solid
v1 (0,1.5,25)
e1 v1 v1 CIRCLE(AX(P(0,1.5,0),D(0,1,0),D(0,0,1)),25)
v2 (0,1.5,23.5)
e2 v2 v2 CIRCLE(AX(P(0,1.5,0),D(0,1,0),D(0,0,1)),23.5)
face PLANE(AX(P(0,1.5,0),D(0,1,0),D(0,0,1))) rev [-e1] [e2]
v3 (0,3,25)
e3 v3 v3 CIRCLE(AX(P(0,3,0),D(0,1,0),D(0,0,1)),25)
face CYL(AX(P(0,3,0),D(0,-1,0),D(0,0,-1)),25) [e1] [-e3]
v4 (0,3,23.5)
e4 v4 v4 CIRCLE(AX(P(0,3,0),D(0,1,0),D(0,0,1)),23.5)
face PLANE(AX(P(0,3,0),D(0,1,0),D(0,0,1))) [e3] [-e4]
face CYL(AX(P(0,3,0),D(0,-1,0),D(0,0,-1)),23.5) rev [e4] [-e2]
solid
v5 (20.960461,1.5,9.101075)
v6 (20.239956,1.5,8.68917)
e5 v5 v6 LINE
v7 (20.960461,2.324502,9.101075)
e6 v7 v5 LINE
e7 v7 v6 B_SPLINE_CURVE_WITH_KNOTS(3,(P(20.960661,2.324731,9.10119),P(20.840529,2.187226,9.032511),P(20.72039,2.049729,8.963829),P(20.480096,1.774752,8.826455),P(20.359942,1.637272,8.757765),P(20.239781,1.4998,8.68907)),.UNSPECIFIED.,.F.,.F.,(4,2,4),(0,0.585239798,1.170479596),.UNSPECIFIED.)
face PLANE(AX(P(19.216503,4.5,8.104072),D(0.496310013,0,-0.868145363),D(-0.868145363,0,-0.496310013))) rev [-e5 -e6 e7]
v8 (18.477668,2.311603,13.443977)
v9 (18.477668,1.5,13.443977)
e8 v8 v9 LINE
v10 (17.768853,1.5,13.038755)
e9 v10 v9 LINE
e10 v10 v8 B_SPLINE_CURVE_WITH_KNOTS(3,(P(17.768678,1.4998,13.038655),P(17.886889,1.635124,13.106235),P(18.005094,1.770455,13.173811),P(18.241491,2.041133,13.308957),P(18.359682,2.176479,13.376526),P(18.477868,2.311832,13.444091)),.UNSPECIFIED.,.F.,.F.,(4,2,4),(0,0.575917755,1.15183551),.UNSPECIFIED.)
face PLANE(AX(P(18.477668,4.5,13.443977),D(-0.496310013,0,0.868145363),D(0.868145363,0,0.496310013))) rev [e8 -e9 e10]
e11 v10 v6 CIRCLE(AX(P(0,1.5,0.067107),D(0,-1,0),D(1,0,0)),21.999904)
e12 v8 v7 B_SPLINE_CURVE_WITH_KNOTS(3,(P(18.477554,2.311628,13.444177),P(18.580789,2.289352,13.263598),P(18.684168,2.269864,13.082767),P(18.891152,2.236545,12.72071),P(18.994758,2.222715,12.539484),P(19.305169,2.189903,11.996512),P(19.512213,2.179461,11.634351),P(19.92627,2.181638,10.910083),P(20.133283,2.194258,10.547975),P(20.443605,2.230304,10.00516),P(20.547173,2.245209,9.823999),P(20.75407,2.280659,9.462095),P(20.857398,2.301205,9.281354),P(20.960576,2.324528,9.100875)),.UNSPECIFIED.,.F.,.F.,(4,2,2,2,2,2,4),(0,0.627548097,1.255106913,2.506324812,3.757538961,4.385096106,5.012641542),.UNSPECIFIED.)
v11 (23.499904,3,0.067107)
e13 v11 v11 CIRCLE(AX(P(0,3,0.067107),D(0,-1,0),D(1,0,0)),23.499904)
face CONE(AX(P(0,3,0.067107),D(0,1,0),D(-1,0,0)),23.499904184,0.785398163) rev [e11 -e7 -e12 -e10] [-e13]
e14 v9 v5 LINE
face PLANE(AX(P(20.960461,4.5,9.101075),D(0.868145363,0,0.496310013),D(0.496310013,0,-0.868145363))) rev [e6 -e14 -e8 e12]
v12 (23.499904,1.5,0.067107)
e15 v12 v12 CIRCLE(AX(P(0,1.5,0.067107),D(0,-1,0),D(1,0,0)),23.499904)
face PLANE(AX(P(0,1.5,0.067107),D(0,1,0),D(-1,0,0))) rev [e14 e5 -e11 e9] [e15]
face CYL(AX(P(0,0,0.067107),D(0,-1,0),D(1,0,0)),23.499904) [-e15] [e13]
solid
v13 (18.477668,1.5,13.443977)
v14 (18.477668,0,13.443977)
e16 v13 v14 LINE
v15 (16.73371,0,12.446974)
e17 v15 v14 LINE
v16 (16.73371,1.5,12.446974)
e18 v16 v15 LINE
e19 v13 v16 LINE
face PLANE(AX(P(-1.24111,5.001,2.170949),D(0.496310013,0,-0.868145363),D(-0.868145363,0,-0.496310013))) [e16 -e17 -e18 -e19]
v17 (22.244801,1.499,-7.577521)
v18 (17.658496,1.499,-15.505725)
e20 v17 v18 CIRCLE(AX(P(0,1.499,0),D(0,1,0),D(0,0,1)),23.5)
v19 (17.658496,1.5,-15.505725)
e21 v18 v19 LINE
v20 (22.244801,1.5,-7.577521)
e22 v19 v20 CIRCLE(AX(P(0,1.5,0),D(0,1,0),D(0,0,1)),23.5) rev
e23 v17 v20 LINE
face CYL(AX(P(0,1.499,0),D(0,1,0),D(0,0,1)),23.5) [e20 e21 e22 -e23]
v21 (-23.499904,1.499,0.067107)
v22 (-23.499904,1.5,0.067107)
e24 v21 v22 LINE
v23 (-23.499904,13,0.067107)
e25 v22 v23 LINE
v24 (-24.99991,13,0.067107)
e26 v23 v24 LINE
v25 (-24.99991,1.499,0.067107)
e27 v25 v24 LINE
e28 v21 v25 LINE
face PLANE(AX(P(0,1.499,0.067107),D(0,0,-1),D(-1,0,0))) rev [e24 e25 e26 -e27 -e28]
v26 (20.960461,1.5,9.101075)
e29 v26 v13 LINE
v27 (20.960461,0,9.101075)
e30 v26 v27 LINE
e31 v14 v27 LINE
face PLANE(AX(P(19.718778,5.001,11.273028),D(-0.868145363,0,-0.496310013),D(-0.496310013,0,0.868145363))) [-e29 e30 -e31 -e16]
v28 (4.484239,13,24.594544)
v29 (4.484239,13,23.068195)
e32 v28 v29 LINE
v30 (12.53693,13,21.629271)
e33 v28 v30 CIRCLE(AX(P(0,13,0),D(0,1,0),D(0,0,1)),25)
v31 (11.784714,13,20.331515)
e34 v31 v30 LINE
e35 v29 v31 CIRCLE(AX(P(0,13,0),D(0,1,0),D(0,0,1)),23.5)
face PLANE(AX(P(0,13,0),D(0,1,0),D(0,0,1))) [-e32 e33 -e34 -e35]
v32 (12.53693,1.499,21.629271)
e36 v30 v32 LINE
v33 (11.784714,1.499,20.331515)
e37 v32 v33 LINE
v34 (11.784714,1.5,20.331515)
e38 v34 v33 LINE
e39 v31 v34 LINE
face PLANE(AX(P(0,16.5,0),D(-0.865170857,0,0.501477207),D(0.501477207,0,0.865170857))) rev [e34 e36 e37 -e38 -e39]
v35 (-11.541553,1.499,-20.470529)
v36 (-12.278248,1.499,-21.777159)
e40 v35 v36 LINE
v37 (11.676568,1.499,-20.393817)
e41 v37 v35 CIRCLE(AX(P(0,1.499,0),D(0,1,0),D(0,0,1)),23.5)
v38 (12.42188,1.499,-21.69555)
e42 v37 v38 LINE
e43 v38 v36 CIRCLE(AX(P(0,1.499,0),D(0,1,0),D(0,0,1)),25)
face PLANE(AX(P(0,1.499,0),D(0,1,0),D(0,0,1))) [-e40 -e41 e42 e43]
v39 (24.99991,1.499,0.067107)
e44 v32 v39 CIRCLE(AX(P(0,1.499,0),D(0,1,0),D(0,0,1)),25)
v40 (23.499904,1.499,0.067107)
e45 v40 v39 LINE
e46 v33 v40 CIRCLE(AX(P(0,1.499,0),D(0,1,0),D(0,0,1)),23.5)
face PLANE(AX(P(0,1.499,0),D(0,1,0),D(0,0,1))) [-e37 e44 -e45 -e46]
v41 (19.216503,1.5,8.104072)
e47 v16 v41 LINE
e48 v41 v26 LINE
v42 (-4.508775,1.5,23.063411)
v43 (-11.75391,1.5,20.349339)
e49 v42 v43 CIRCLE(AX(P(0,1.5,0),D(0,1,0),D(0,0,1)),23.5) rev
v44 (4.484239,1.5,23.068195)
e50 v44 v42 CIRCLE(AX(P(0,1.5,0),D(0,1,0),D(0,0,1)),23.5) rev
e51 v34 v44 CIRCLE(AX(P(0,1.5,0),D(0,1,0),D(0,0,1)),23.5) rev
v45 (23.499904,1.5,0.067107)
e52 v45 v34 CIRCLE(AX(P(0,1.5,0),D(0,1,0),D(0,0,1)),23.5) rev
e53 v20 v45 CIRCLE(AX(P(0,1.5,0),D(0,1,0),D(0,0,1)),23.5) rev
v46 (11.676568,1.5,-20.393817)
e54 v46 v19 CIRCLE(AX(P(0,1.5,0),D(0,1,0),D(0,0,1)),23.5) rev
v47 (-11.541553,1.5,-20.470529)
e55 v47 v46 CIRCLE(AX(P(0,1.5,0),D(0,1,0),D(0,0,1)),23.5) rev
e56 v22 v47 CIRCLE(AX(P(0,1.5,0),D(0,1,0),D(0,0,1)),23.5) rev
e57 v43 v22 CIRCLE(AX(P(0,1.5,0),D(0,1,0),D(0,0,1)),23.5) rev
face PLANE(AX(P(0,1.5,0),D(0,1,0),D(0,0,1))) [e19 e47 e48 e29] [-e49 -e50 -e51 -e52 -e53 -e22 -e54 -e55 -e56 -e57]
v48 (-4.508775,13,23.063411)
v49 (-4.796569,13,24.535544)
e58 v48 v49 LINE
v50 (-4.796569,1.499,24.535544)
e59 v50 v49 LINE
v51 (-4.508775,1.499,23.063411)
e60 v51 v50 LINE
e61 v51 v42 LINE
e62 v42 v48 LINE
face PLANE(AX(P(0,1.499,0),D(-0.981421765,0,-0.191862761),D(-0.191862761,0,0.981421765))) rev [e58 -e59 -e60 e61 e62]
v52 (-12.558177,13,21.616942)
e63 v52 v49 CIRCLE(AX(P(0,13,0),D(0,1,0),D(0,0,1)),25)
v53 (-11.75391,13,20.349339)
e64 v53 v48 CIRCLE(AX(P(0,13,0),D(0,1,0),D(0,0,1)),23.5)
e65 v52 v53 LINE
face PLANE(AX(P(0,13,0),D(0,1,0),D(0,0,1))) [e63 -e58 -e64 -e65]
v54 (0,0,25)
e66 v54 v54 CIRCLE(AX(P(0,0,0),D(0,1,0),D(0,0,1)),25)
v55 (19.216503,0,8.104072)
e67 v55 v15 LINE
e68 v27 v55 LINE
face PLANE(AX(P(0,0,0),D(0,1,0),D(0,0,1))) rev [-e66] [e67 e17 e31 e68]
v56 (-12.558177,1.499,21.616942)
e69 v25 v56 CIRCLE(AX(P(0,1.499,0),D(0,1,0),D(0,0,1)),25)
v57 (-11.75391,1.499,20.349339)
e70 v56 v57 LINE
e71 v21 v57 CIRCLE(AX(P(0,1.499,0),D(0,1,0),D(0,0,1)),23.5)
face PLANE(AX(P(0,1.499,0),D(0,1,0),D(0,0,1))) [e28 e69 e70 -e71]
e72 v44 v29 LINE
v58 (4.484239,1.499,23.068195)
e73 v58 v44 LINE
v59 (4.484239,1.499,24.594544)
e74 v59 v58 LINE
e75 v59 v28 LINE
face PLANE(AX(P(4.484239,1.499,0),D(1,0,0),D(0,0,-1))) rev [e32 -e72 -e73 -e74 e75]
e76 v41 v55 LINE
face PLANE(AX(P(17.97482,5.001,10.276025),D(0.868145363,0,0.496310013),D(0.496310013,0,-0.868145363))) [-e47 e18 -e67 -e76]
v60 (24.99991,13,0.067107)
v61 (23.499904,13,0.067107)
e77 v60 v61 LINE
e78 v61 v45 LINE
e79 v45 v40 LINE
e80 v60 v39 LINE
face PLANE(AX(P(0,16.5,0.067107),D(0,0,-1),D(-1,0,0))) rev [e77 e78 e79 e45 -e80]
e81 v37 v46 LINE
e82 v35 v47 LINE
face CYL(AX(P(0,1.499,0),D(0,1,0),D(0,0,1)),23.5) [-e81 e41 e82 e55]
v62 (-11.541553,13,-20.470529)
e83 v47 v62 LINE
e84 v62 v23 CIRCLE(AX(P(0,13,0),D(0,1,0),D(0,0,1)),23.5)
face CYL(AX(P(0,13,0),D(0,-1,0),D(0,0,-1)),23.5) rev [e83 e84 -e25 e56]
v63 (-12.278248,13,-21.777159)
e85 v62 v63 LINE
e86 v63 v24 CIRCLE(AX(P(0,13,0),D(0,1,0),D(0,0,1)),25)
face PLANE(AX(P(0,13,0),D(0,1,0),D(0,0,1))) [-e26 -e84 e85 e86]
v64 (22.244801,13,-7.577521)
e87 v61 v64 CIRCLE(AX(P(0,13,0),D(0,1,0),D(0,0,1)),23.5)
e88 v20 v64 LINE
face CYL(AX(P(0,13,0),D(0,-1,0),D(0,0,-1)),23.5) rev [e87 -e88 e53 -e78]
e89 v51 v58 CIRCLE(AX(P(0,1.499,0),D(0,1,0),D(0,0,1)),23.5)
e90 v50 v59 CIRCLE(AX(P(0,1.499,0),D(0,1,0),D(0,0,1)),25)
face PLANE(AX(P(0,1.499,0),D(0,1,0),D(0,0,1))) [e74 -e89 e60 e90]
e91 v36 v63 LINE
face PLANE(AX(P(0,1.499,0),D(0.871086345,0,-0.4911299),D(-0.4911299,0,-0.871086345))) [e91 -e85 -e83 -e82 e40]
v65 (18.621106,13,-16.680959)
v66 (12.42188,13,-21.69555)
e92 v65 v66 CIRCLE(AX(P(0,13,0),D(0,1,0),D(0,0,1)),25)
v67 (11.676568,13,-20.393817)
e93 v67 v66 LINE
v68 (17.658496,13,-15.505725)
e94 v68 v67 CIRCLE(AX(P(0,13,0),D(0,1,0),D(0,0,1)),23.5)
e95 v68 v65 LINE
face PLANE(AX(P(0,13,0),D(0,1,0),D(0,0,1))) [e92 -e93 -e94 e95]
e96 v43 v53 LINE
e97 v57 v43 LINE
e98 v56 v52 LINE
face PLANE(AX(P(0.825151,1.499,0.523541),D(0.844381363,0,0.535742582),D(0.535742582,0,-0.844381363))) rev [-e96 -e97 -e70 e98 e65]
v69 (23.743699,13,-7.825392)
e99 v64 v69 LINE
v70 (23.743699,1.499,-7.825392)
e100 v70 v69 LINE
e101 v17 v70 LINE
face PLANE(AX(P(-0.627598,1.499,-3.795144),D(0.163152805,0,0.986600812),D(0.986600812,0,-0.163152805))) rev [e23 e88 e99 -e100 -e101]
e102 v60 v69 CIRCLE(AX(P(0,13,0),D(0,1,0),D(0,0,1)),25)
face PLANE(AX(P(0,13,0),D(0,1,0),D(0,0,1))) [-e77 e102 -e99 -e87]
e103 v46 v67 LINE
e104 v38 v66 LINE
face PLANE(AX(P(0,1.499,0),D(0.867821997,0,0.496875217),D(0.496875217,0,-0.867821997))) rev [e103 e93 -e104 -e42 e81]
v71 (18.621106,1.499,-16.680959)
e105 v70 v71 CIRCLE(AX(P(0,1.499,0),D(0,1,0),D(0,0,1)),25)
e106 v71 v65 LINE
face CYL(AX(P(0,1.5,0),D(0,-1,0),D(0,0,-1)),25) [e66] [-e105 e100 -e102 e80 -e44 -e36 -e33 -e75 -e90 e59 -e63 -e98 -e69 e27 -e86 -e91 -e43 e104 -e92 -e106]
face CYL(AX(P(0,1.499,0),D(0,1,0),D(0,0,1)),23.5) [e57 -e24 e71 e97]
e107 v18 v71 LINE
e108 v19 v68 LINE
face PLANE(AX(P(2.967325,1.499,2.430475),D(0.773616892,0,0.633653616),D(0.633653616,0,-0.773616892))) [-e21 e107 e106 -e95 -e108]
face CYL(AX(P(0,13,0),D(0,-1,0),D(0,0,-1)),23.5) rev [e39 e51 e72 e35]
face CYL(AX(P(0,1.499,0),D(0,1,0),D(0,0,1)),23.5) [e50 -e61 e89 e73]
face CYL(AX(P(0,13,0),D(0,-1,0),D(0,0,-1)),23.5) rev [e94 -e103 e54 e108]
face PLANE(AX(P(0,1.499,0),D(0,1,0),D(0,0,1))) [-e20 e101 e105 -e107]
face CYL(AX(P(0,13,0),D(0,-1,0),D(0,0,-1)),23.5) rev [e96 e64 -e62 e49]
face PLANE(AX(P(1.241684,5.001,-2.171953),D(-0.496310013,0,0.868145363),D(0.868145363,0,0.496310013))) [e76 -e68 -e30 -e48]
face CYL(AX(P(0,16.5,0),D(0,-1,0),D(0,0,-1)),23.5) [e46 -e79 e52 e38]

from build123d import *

# Parameters (mm, degrees)
SKETCH1_R               = 25
BOSS_EXTRUDE1_DEPTH     = 1.5
BOSS_EXTRUDE2_DEPTH     = 11.5
CUT_EXTRUDE3_DEPTH      = 15
CUT_EXTRUDE3_DEPTH_BACK = 0.001
CUT_EXTRUDE4_DEPTH      = 5.001
SKETCH9_R               = 25
SKETCH9_R_2             = 23.5
BOSS_EXTRUDE4_DEPTH     = 1.5
CUT_EXTRUDE5_DEPTH      = 4.5


with BuildPart() as part:
    # Sketch1 → Boss-Extrude1 (new body)
    with BuildSketch(Plane(origin=(0, 0, 0), x_dir=(1, 0, 0), z_dir=(0, 1, 0))):
        Circle(SKETCH1_R)
    extrude(amount=BOSS_EXTRUDE1_DEPTH)

    # Sketch3 → Boss-Extrude2 (add)
    with BuildSketch(Plane(origin=(0, 1.5, 0), x_dir=(1, 0, 0), z_dir=(0, 1, 0))):
        with BuildLine():
            ThreePointArc((25, 0), (-10.270047641, 22.793115659), (-16.562089716, -18.726910696))
            ThreePointArc((-16.562089716, -18.726910696), (10.270047641, -22.793115659), (25, 0))
        make_face()
        with BuildLine():
            ThreePointArc((23.5, 0), (9.653844782, -21.42552872), (-15.568364333, -17.603296054))
            ThreePointArc((-15.568364333, -17.603296054), (-9.653844782, 21.42552872), (23.5, 0))
        make_face(mode=Mode.SUBTRACT)
    extrude(amount=BOSS_EXTRUDE2_DEPTH)

    # Sketch4 → Cut-Extrude3 (cut, two sides: drawn at the far end of the back side and taken through both)
    with BuildSketch(Plane(origin=(0, 1.5, 0), x_dir=(1, 0, 0), z_dir=(0, 1, 0)).offset(-CUT_EXTRUDE3_DEPTH_BACK)):
        with BuildLine():
            Line((11.784714356, -20.331515132), (12.536930166, -21.629271417))
            ThreePointArc((12.536930166, -21.629271417), (21.64452184, -12.510582494), (24.999909933, -0.067106913))
            Line((24.999909933, -0.067106913), (23.499904184, -0.067106913))
            ThreePointArc((23.499904184, -0.067106913), (20.344842995, -11.761690504), (11.784714356, -20.331515132))
        make_face()
        with BuildLine():
            ThreePointArc((-4.796569027, -24.535544126), (-0.158926829, -24.99949484), (4.48423915, -24.594544095))
            Line((4.48423915, -24.594544095), (4.48423915, -23.068194538))
            ThreePointArc((4.48423915, -23.068194538), (-0.0124988, -23.499996676), (-4.508774886, -23.063411479))
            Line((-4.508774886, -23.063411479), (-4.796569027, -24.535544126))
        make_face()
        with BuildLine():
            ThreePointArc((-24.999909933, -0.067106913), (-21.650665798, -12.49994682), (-12.558177453, -21.616941945))
            Line((-12.558177453, -21.616941945), (-11.753909653, -20.349339249))
            ThreePointArc((-11.753909653, -20.349339249), (-20.335930877, -11.777092823), (-23.499904184, -0.067106913))
            Line((-23.499904184, -0.067106913), (-24.999909933, -0.067106913))
        make_face()
        with BuildLine():
            Line((22.244801118, 7.577520917), (23.743699089, 7.825391591))
            ThreePointArc((23.743699089, 7.825391591), (21.640227627, 12.518008956), (18.621106201, 16.680959321))
            Line((18.621106201, 16.680959321), (17.658496176, 15.505725162))
            ThreePointArc((17.658496176, 15.505725162), (20.341641757, 11.767226123), (22.244801118, 7.577520917))
        make_face()
        with BuildLine():
            ThreePointArc((12.42188042, 21.695549931), (0.082599021, 24.999863548), (-12.27824751, 21.777158632))
            Line((-12.27824751, 21.777158632), (-11.541552659, 20.470529114))
            ThreePointArc((-11.541552659, 20.470529114), (0.07764308, 23.499871735), (11.676567595, 20.393816936))
            Line((11.676567595, 20.393816936), (12.42188042, 21.695549931))
        make_face()
    extrude(amount=CUT_EXTRUDE3_DEPTH + CUT_EXTRUDE3_DEPTH_BACK, mode=Mode.SUBTRACT)

    # Sketch5 → Cut-Extrude4 (cut)
    with BuildSketch(Plane.XZ):
        Polygon((16.733709956, 12.446973803), (19.216503445, 8.104071987), (20.960461392, 9.101075286), (18.477667903, 13.443977102), align=None)
    extrude(amount=-CUT_EXTRUDE4_DEPTH, mode=Mode.SUBTRACT)


with BuildPart() as body_2:
    # Sketch8 → Revolve4 (revolve)
    with BuildSketch(Plane.XY.offset(0.067106913)):
        Polygon((-23.499904184, 3), (-23.499904184, 1.5), (-21.999904184, 1.5), align=None)
    revolve(axis=Axis((0, 0, 0.067106913), (0, 1, 0)))

    # Sketch10 → Cut-Extrude5 (cut)
    with BuildSketch(Plane.XZ):
        Polygon((19.216503445, 8.104071987), (20.960461392, 9.101075286), (18.477667903, 13.443977102), (16.733709956, 12.446973803), align=None)
    extrude(amount=-CUT_EXTRUDE5_DEPTH, mode=Mode.SUBTRACT)


with BuildPart() as body_3:
    # Sketch9 → Boss-Extrude4 (new body)
    with BuildSketch(Plane(origin=(0, 1.5, 0), x_dir=(1, 0, 0), z_dir=(0, 1, 0))):
        Circle(SKETCH9_R)
        Circle(SKETCH9_R_2, mode=Mode.SUBTRACT)
    extrude(amount=BOSS_EXTRUDE4_DEPTH)


solid = Compound([part.part, body_2.part, body_3.part])
